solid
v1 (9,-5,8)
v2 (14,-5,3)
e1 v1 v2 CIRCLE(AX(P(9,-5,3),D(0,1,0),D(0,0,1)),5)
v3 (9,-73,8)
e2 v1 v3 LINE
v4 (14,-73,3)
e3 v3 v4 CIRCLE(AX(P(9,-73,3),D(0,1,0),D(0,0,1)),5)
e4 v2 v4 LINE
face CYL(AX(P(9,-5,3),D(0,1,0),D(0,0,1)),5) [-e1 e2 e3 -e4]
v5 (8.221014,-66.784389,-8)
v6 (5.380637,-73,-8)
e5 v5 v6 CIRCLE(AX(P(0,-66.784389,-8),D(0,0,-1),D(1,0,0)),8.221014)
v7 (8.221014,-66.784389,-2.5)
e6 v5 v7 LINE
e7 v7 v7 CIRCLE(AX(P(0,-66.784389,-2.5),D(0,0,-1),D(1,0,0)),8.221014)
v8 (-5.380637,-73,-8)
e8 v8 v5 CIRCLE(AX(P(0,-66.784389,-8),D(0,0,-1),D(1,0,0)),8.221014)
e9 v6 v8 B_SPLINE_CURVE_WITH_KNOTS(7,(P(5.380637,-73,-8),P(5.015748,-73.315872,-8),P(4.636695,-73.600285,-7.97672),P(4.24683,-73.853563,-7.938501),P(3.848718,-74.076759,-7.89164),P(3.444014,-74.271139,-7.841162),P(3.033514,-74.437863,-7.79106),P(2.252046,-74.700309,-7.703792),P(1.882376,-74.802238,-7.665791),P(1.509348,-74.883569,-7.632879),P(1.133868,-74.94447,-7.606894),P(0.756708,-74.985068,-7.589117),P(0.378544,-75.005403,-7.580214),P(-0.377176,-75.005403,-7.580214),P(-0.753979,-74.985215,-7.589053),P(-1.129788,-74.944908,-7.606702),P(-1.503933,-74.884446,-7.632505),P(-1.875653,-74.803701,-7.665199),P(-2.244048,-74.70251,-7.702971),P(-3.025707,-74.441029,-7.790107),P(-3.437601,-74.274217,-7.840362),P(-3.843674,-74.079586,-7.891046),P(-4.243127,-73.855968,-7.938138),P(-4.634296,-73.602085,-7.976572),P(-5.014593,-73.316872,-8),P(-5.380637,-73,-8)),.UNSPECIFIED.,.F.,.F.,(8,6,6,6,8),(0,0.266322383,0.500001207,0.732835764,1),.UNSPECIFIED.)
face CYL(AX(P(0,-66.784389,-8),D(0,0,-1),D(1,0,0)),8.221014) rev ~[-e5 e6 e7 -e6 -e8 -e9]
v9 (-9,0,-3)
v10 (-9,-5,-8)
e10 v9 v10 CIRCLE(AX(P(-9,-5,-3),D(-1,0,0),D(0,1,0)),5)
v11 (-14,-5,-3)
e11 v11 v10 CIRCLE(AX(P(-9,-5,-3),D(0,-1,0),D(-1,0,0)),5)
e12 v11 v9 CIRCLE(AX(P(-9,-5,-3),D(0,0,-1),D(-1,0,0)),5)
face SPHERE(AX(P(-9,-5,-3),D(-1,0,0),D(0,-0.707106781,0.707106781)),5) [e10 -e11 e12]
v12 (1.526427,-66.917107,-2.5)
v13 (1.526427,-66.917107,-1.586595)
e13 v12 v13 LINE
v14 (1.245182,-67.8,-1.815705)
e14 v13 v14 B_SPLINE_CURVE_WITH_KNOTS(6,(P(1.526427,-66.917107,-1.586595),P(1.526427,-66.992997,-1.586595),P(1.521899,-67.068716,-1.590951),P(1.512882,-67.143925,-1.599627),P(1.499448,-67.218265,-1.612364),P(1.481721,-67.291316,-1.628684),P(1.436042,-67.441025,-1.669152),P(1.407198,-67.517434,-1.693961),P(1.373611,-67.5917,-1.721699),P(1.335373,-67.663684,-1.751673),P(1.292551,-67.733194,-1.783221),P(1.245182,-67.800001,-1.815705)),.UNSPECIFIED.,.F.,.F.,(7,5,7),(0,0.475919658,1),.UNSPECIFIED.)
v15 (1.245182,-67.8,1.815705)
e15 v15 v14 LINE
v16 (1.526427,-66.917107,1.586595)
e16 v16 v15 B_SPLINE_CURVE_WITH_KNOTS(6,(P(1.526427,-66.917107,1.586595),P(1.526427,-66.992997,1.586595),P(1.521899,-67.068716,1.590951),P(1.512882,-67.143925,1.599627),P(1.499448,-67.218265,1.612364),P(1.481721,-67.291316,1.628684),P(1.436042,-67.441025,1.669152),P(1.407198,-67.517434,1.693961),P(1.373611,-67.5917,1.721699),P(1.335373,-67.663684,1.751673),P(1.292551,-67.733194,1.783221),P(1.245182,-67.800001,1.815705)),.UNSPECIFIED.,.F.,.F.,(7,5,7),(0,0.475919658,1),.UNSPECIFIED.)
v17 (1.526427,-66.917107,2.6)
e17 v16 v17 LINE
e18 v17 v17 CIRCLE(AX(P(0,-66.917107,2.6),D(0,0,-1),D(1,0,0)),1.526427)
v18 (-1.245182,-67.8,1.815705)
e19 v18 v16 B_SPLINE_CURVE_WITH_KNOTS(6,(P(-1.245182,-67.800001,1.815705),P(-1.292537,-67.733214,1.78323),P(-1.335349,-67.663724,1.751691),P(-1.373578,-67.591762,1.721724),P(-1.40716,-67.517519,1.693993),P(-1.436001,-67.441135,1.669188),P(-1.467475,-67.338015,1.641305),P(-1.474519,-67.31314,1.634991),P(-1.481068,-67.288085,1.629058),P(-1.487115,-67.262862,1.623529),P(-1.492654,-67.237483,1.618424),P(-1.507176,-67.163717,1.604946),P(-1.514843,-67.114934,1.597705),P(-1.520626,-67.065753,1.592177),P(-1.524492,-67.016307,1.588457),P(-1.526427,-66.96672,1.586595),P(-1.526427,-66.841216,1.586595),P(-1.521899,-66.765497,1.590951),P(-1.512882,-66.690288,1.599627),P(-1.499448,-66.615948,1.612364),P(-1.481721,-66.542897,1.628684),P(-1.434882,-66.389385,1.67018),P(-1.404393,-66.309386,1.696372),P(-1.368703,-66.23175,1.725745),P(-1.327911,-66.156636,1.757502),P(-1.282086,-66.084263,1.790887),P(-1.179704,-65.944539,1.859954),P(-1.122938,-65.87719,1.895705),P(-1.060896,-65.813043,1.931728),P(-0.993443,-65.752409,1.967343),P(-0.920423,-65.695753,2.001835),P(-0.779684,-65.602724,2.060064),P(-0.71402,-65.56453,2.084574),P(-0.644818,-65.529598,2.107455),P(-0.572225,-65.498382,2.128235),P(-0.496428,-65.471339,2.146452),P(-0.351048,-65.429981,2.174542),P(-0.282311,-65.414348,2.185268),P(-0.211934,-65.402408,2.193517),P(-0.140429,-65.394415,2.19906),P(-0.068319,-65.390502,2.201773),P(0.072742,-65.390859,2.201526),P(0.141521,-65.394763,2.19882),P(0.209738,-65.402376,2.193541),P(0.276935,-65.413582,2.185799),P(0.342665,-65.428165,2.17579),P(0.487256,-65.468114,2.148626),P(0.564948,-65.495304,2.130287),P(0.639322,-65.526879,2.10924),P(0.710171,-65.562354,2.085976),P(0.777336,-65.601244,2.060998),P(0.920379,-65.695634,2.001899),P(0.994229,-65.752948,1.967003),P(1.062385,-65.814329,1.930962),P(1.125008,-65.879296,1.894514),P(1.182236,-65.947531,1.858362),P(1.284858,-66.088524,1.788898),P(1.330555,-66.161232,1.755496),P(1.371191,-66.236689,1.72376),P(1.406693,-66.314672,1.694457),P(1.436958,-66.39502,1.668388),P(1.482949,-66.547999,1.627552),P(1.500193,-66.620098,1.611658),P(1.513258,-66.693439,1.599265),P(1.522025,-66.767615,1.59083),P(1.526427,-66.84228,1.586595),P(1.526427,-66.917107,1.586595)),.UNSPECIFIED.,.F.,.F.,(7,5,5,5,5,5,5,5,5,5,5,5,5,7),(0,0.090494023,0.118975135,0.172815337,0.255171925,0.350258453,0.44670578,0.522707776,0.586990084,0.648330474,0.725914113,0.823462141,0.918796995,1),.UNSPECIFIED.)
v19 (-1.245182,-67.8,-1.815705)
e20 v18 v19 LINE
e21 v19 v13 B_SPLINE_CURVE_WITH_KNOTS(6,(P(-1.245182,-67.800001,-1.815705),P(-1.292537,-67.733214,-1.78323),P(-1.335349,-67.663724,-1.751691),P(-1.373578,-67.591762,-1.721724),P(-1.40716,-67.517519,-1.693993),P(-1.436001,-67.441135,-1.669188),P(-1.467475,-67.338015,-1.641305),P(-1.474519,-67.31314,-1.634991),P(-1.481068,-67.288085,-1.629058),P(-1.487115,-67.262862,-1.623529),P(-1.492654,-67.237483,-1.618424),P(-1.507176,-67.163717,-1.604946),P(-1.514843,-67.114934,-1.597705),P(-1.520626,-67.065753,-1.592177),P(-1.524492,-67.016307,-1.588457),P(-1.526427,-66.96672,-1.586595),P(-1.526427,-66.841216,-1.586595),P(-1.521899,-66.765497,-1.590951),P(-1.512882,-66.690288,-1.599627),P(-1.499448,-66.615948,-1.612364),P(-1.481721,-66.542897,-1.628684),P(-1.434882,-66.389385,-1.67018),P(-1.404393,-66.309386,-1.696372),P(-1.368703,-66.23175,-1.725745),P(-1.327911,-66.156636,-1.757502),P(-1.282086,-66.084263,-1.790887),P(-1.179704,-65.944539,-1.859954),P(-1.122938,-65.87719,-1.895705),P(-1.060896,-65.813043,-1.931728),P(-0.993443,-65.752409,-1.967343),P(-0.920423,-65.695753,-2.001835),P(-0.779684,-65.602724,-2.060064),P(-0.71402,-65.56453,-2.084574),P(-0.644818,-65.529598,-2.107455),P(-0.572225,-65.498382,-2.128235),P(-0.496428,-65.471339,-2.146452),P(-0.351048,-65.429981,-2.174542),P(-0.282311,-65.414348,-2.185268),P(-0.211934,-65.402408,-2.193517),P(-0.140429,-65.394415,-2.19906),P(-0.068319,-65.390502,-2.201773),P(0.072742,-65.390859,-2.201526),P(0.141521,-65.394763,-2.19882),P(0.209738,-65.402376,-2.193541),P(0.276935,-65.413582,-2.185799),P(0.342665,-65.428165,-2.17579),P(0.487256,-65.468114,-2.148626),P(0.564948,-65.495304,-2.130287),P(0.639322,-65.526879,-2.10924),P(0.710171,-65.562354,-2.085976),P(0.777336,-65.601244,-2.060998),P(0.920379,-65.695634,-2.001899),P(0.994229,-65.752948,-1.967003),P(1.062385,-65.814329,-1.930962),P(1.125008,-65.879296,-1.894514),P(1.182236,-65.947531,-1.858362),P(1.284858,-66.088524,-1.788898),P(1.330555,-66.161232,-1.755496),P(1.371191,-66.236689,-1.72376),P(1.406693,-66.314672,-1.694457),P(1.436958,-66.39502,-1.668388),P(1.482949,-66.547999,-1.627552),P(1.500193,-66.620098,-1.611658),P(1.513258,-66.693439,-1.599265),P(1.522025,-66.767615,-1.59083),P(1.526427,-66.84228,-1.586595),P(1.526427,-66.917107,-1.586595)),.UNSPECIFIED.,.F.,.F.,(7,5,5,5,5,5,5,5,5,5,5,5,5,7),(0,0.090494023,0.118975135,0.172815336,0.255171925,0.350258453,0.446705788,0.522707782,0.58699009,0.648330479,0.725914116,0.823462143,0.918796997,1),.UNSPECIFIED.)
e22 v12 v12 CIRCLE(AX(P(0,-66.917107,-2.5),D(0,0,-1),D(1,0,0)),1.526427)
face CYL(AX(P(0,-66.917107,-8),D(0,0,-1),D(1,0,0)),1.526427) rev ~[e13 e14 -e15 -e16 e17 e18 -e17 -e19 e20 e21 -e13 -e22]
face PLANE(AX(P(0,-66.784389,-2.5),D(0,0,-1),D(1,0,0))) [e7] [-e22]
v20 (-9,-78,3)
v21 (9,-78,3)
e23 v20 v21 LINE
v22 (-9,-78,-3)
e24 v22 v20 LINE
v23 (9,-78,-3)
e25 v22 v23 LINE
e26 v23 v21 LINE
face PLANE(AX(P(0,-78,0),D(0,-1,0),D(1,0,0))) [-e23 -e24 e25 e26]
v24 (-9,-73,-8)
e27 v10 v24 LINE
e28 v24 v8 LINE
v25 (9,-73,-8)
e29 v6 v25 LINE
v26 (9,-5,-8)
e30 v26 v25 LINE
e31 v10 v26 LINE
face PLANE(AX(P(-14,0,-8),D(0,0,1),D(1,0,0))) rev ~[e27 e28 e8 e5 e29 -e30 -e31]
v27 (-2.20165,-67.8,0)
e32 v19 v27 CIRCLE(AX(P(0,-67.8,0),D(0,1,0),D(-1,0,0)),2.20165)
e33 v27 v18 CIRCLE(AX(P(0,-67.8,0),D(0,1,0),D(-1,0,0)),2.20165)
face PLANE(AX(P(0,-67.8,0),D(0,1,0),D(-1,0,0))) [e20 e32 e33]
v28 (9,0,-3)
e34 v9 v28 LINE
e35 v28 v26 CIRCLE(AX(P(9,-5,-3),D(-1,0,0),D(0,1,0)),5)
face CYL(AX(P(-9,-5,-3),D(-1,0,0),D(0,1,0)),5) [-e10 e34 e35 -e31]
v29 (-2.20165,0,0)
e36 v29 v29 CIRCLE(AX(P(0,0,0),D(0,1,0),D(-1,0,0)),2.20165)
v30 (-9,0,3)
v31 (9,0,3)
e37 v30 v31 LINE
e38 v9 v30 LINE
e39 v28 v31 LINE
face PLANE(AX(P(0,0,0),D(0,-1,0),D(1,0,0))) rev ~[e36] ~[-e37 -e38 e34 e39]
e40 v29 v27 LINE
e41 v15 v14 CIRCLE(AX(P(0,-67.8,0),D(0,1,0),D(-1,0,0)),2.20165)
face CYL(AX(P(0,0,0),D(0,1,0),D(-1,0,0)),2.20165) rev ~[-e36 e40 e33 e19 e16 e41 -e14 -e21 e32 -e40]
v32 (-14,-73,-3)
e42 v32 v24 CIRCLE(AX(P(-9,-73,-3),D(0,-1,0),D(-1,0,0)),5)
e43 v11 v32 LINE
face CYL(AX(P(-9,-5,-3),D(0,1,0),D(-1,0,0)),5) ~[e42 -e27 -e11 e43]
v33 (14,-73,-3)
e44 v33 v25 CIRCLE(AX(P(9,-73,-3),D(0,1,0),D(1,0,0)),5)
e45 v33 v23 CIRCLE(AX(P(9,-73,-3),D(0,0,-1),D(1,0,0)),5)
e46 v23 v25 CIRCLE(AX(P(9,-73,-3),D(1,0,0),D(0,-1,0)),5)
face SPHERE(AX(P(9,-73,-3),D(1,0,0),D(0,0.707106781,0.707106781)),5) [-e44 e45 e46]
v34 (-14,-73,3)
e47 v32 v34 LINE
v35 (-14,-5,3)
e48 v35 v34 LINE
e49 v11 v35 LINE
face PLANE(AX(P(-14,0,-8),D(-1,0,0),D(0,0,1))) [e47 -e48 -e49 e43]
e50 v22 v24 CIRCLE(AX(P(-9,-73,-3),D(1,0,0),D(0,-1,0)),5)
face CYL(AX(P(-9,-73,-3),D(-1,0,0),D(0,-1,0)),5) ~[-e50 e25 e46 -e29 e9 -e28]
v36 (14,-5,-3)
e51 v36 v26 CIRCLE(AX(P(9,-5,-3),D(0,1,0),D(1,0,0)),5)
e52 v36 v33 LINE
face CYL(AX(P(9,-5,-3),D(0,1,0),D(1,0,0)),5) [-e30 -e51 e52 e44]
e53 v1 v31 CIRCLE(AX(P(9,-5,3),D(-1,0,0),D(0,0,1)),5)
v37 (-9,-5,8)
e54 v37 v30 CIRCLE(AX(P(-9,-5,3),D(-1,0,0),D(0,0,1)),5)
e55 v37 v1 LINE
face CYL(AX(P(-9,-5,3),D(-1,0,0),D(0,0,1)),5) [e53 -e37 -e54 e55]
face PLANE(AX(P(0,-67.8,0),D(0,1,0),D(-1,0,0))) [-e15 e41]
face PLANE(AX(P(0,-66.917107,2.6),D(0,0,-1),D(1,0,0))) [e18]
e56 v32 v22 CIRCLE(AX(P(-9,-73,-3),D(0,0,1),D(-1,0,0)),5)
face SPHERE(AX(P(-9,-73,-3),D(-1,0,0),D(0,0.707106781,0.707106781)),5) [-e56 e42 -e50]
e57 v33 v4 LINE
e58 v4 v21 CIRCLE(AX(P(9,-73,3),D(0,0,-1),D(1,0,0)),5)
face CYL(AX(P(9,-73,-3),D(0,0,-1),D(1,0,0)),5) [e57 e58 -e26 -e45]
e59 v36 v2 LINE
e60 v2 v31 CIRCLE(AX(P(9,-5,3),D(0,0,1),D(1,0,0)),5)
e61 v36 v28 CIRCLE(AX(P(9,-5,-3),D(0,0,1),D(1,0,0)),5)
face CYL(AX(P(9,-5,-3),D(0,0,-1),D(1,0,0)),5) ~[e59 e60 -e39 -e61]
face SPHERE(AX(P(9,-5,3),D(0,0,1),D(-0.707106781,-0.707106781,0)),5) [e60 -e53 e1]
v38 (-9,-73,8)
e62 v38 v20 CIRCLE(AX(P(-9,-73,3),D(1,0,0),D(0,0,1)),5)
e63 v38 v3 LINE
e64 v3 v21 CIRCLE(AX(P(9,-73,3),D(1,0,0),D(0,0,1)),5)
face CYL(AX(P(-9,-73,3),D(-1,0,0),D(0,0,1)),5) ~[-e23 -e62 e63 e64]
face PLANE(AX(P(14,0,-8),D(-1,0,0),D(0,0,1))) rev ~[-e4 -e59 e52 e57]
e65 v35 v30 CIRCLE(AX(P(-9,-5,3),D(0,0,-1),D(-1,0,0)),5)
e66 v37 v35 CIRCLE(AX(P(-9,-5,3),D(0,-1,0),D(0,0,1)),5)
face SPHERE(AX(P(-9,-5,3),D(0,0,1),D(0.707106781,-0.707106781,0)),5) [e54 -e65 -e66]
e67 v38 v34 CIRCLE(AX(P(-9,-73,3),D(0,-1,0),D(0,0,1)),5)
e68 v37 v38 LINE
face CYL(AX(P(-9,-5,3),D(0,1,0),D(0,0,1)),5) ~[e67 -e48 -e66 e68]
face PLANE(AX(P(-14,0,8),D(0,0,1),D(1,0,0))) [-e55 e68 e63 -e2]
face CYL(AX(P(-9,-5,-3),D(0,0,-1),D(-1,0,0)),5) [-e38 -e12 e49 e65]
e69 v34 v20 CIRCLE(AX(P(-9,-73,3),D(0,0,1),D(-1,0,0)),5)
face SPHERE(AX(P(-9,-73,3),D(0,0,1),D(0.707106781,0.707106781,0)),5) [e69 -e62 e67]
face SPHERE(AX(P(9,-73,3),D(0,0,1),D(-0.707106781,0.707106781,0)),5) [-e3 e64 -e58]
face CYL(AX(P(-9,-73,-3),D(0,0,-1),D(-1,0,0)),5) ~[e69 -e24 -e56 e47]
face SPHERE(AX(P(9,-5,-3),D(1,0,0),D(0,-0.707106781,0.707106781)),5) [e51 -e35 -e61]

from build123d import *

# Parameters (mm, degrees)
F0_W         = 28
F0_H         = 16
F1_DEPTH     = 78
F2_R         = 2.2016502053
F4_DEPTH     = 67.8
F5_R         = 1.5264270503
F6_DEPTH     = 10.6
F3_R         = 8.2210139084
F7_DEPTH     = 5.5
F8_T1_DEPTH  = 68
F8_T3_DEPTH  = 18
F8_T5_DEPTH  = 6
F8_S9_W      = 5
F8_S9_H      = 5
F8_T10_DEPTH = 5
F8_S15_W     = 5
F8_S15_H     = 5
F8_T16_DEPTH = 5
F8_S21_W     = 5
F8_S21_H     = 5
F8_T22_DEPTH = 5
F8_S27_W     = 5
F8_S27_H     = 5
F8_T28_DEPTH = 5
F8_S33_W     = 5
F8_S33_H     = 5
F8_T34_DEPTH = 5
F8_S39_W     = 5
F8_S39_H     = 5
F8_T40_DEPTH = 5
F8_S45_W     = 5
F8_S45_H     = 5
F8_T46_DEPTH = 5
F8_S51_W     = 5
F8_S51_H     = 5
F8_T52_DEPTH = 5


# Not quite as in the source:
# - a fillet or chamfer that OpenCascade refuses, or shapes differently, is made with other operations: its cross-section is extruded or revolved along the edge and cut away or added


with BuildPart() as f1:
    # F0 (on Front) → F1 (new body)
    with BuildSketch(Plane.XZ):
        Rectangle(F0_W, F0_H)
    extrude(amount=F1_DEPTH)

    # F2 (on face) → F4 (cut)
    with BuildSketch(Plane(origin=(0, 0, 0), x_dir=(-1, 0, 0), z_dir=(0, 1, 0))):
        Circle(F2_R)
    extrude(amount=-F4_DEPTH, mode=Mode.SUBTRACT)

    # F5 (on face) → F6 (cut)
    with BuildSketch(Plane(origin=(0, 0, -8), x_dir=(1, 0, 0), z_dir=(0, 0, -1))):
        with Locations((0, 66.9171065092)):
            Circle(F5_R)
    extrude(amount=-F6_DEPTH, mode=Mode.SUBTRACT)

    # F3 (on face) → F7 (cut)
    with BuildSketch(Plane(origin=(0, 0, -8), x_dir=(1, 0, 0), z_dir=(0, 0, -1))):
        with Locations((0, 66.784389317)):
            Circle(F3_R)
    extrude(amount=-F7_DEPTH, mode=Mode.SUBTRACT)

    # F8: fillet of radius 5 on 12 edges, made by hand

    # F8_s2 → F8_t1 (cut)
    with BuildSketch(Plane.XZ.offset(5)):
        with BuildLine():
            ThreePointArc((-14, -3), (-12.5355339059, -6.5355339059), (-9, -8))
            Line((-9, -8), (-14, -8))
            Line((-14, -8), (-14, -3))
        make_face()
        with BuildLine():
            ThreePointArc((14, -3), (12.5355339059, -6.5355339059), (9, -8))
            Line((9, -8), (14, -8))
            Line((14, -8), (14, -3))
        make_face()
        with BuildLine():
            ThreePointArc((9, 8), (12.5355339059, 6.5355339059), (14, 3))
            Line((14, 3), (14, 8))
            Line((14, 8), (9, 8))
        make_face()
        with BuildLine():
            ThreePointArc((-9, 8), (-12.5355339059, 6.5355339059), (-14, 3))
            Line((-14, 3), (-14, 8))
            Line((-14, 8), (-9, 8))
        make_face()
    extrude(amount=F8_T1_DEPTH, mode=Mode.SUBTRACT)

    # F8_s4 → F8_t3 (cut)
    with BuildSketch(Plane.YZ.offset(-9)):
        with BuildLine():
            ThreePointArc((-78, -3), (-76.5355339059, -6.5355339059), (-73, -8))
            Line((-73, -8), (-78, -8))
            Line((-78, -8), (-78, -3))
        make_face()
        with BuildLine():
            ThreePointArc((0, -3), (-1.4644660941, -6.5355339059), (-5, -8))
            Line((-5, -8), (0, -8))
            Line((0, -8), (0, -3))
        make_face()
        with BuildLine():
            ThreePointArc((-5, 8), (-1.4644660941, 6.5355339059), (0, 3))
            Line((0, 3), (0, 8))
            Line((0, 8), (-5, 8))
        make_face()
        with BuildLine():
            ThreePointArc((-73, 8), (-76.5355339059, 6.5355339059), (-78, 3))
            Line((-78, 3), (-78, 8))
            Line((-78, 8), (-73, 8))
        make_face()
    extrude(amount=F8_T3_DEPTH, mode=Mode.SUBTRACT)

    # F8_s6 → F8_t5 (cut)
    with BuildSketch(Plane.XY.offset(-3)):
        with BuildLine():
            ThreePointArc((14, -73), (12.5355339059, -76.5355339059), (9, -78))
            Line((9, -78), (14, -78))
            Line((14, -78), (14, -73))
        make_face()
        with BuildLine():
            ThreePointArc((-14, -73), (-12.5355339059, -76.5355339059), (-9, -78))
            Line((-9, -78), (-14, -78))
            Line((-14, -78), (-14, -73))
        make_face()
        with BuildLine():
            ThreePointArc((-14, -5), (-12.5355339059, -1.4644660941), (-9, 0))
            Line((-9, 0), (-14, 0))
            Line((-14, 0), (-14, -5))
        make_face()
        with BuildLine():
            ThreePointArc((14, -5), (12.5355339059, -1.4644660941), (9, 0))
            Line((9, 0), (14, 0))
            Line((14, 0), (14, -5))
        make_face()
    extrude(amount=F8_T5_DEPTH, mode=Mode.SUBTRACT)


with BuildPart() as f8_tool8:
    # F8_s9 → F8_t10 (new body)
    with BuildSketch(Plane.YZ.offset(-9)):
        with Locations((-2.5, -5.5)):
            Rectangle(F8_S9_W, F8_S9_H)
    extrude(amount=-F8_T10_DEPTH)

    # F8_s11 → F8_t12 (revolve, cut)
    with BuildSketch(Plane(origin=(-9, -5, -3), x_dir=(0, -0.7071067812, 0.7071067812), z_dir=(0, -0.7071067812, -0.7071067812))):
        with BuildLine():
            ThreePointArc((0, -5), (5, 0), (0, 5))
            Line((0, 5), (0, -5))
        make_face()
    revolve(axis=Axis((-9, -5, -3), (-1, 0, 0)), mode=Mode.SUBTRACT)


with BuildPart() as f1_1:
    add(f1.part)

    # F8_t7: cut F8_tool8
    add(f8_tool8.part, mode=Mode.SUBTRACT)


with BuildPart() as f8_tool14:
    # F8_s15 → F8_t16 (new body)
    with BuildSketch(Plane.YZ.offset(-9)):
        with Locations((-75.5, -5.5)):
            Rectangle(F8_S15_W, F8_S15_H)
    extrude(amount=-F8_T16_DEPTH)

    # F8_s17 → F8_t18 (revolve, cut)
    with BuildSketch(Plane(origin=(-9, -73, -3), x_dir=(0, 0.7071067812, 0.7071067812), z_dir=(0, -0.7071067812, 0.7071067812))):
        with BuildLine():
            ThreePointArc((0, -5), (5, 0), (0, 5))
            Line((0, 5), (0, -5))
        make_face()
    revolve(axis=Axis((-9, -73, -3), (-1, 0, 0)), mode=Mode.SUBTRACT)


with BuildPart() as f1_2:
    add(f1_1.part)

    # F8_t13: cut F8_tool14
    add(f8_tool14.part, mode=Mode.SUBTRACT)


with BuildPart() as f8_tool20:
    # F8_s21 → F8_t22 (new body)
    with BuildSketch(Plane.YZ.offset(9)):
        with Locations((-75.5, -5.5)):
            Rectangle(F8_S21_W, F8_S21_H)
    extrude(amount=F8_T22_DEPTH)

    # F8_s23 → F8_t24 (revolve, cut)
    with BuildSketch(Plane(origin=(9, -73, -3), x_dir=(0, 0.7071067812, 0.7071067812), z_dir=(0, 0.7071067812, -0.7071067812))):
        with BuildLine():
            ThreePointArc((0, -5), (5, 0), (0, 5))
            Line((0, 5), (0, -5))
        make_face()
    revolve(axis=Axis((9, -73, -3), (1, 0, 0)), mode=Mode.SUBTRACT)


with BuildPart() as f1_3:
    add(f1_2.part)

    # F8_t19: cut F8_tool20
    add(f8_tool20.part, mode=Mode.SUBTRACT)


with BuildPart() as f8_tool26:
    # F8_s27 → F8_t28 (new body)
    with BuildSketch(Plane.YZ.offset(9)):
        with Locations((-2.5, -5.5)):
            Rectangle(F8_S27_W, F8_S27_H)
    extrude(amount=F8_T28_DEPTH)

    # F8_s29 → F8_t30 (revolve, cut)
    with BuildSketch(Plane(origin=(9, -5, -3), x_dir=(0, -0.7071067812, 0.7071067812), z_dir=(0, 0.7071067812, 0.7071067812))):
        with BuildLine():
            ThreePointArc((0, -5), (5, 0), (0, 5))
            Line((0, 5), (0, -5))
        make_face()
    revolve(axis=Axis((9, -5, -3), (1, 0, 0)), mode=Mode.SUBTRACT)


with BuildPart() as f1_4:
    add(f1_3.part)

    # F8_t25: cut F8_tool26
    add(f8_tool26.part, mode=Mode.SUBTRACT)


with BuildPart() as f8_tool32:
    # F8_s33 → F8_t34 (new body)
    with BuildSketch(Plane.XY.offset(3)):
        with Locations((11.5, -2.5)):
            Rectangle(F8_S33_W, F8_S33_H)
    extrude(amount=F8_T34_DEPTH)

    # F8_s35 → F8_t36 (revolve, cut)
    with BuildSketch(Plane(origin=(9, -5, 3), x_dir=(-0.7071067812, -0.7071067812, 0), z_dir=(-0.7071067812, 0.7071067812, 0))):
        with BuildLine():
            ThreePointArc((0, -5), (5, 0), (0, 5))
            Line((0, 5), (0, -5))
        make_face()
    revolve(axis=Axis((9, -5, 3), (0, 0, 1)), mode=Mode.SUBTRACT)


with BuildPart() as f1_5:
    add(f1_4.part)

    # F8_t31: cut F8_tool32
    add(f8_tool32.part, mode=Mode.SUBTRACT)


with BuildPart() as f8_tool38:
    # F8_s39 → F8_t40 (new body)
    with BuildSketch(Plane.XY.offset(3)):
        with Locations((-11.5, -2.5)):
            Rectangle(F8_S39_W, F8_S39_H)
    extrude(amount=F8_T40_DEPTH)

    # F8_s41 → F8_t42 (revolve, cut)
    with BuildSketch(Plane(origin=(-9, -5, 3), x_dir=(0.7071067812, -0.7071067812, 0), z_dir=(-0.7071067812, -0.7071067812, 0))):
        with BuildLine():
            ThreePointArc((0, -5), (5, 0), (0, 5))
            Line((0, 5), (0, -5))
        make_face()
    revolve(axis=Axis((-9, -5, 3), (0, 0, 1)), mode=Mode.SUBTRACT)


with BuildPart() as f1_6:
    add(f1_5.part)

    # F8_t37: cut F8_tool38
    add(f8_tool38.part, mode=Mode.SUBTRACT)


with BuildPart() as f8_tool44:
    # F8_s45 → F8_t46 (new body)
    with BuildSketch(Plane.XY.offset(3)):
        with Locations((11.5, -75.5)):
            Rectangle(F8_S45_W, F8_S45_H)
    extrude(amount=F8_T46_DEPTH)

    # F8_s47 → F8_t48 (revolve, cut)
    with BuildSketch(Plane(origin=(9, -73, 3), x_dir=(-0.7071067812, 0.7071067812, 0), z_dir=(0.7071067812, 0.7071067812, 0))):
        with BuildLine():
            ThreePointArc((0, -5), (5, 0), (0, 5))
            Line((0, 5), (0, -5))
        make_face()
    revolve(axis=Axis((9, -73, 3), (0, 0, 1)), mode=Mode.SUBTRACT)


with BuildPart() as f1_7:
    add(f1_6.part)

    # F8_t43: cut F8_tool44
    add(f8_tool44.part, mode=Mode.SUBTRACT)


with BuildPart() as f8_tool50:
    # F8_s51 → F8_t52 (new body)
    with BuildSketch(Plane.XY.offset(3)):
        with Locations((-11.5, -75.5)):
            Rectangle(F8_S51_W, F8_S51_H)
    extrude(amount=F8_T52_DEPTH)

    # F8_s53 → F8_t54 (revolve, cut)
    with BuildSketch(Plane(origin=(-9, -73, 3), x_dir=(0.7071067812, 0.7071067812, 0), z_dir=(0.7071067812, -0.7071067812, 0))):
        with BuildLine():
            ThreePointArc((0, -5), (5, 0), (0, 5))
            Line((0, 5), (0, -5))
        make_face()
    revolve(axis=Axis((-9, -73, 3), (0, 0, 1)), mode=Mode.SUBTRACT)


with BuildPart() as f1_8:
    add(f1_7.part)

    # F8_t49: cut F8_tool50
    add(f8_tool50.part, mode=Mode.SUBTRACT)


solid = f1_8.part
